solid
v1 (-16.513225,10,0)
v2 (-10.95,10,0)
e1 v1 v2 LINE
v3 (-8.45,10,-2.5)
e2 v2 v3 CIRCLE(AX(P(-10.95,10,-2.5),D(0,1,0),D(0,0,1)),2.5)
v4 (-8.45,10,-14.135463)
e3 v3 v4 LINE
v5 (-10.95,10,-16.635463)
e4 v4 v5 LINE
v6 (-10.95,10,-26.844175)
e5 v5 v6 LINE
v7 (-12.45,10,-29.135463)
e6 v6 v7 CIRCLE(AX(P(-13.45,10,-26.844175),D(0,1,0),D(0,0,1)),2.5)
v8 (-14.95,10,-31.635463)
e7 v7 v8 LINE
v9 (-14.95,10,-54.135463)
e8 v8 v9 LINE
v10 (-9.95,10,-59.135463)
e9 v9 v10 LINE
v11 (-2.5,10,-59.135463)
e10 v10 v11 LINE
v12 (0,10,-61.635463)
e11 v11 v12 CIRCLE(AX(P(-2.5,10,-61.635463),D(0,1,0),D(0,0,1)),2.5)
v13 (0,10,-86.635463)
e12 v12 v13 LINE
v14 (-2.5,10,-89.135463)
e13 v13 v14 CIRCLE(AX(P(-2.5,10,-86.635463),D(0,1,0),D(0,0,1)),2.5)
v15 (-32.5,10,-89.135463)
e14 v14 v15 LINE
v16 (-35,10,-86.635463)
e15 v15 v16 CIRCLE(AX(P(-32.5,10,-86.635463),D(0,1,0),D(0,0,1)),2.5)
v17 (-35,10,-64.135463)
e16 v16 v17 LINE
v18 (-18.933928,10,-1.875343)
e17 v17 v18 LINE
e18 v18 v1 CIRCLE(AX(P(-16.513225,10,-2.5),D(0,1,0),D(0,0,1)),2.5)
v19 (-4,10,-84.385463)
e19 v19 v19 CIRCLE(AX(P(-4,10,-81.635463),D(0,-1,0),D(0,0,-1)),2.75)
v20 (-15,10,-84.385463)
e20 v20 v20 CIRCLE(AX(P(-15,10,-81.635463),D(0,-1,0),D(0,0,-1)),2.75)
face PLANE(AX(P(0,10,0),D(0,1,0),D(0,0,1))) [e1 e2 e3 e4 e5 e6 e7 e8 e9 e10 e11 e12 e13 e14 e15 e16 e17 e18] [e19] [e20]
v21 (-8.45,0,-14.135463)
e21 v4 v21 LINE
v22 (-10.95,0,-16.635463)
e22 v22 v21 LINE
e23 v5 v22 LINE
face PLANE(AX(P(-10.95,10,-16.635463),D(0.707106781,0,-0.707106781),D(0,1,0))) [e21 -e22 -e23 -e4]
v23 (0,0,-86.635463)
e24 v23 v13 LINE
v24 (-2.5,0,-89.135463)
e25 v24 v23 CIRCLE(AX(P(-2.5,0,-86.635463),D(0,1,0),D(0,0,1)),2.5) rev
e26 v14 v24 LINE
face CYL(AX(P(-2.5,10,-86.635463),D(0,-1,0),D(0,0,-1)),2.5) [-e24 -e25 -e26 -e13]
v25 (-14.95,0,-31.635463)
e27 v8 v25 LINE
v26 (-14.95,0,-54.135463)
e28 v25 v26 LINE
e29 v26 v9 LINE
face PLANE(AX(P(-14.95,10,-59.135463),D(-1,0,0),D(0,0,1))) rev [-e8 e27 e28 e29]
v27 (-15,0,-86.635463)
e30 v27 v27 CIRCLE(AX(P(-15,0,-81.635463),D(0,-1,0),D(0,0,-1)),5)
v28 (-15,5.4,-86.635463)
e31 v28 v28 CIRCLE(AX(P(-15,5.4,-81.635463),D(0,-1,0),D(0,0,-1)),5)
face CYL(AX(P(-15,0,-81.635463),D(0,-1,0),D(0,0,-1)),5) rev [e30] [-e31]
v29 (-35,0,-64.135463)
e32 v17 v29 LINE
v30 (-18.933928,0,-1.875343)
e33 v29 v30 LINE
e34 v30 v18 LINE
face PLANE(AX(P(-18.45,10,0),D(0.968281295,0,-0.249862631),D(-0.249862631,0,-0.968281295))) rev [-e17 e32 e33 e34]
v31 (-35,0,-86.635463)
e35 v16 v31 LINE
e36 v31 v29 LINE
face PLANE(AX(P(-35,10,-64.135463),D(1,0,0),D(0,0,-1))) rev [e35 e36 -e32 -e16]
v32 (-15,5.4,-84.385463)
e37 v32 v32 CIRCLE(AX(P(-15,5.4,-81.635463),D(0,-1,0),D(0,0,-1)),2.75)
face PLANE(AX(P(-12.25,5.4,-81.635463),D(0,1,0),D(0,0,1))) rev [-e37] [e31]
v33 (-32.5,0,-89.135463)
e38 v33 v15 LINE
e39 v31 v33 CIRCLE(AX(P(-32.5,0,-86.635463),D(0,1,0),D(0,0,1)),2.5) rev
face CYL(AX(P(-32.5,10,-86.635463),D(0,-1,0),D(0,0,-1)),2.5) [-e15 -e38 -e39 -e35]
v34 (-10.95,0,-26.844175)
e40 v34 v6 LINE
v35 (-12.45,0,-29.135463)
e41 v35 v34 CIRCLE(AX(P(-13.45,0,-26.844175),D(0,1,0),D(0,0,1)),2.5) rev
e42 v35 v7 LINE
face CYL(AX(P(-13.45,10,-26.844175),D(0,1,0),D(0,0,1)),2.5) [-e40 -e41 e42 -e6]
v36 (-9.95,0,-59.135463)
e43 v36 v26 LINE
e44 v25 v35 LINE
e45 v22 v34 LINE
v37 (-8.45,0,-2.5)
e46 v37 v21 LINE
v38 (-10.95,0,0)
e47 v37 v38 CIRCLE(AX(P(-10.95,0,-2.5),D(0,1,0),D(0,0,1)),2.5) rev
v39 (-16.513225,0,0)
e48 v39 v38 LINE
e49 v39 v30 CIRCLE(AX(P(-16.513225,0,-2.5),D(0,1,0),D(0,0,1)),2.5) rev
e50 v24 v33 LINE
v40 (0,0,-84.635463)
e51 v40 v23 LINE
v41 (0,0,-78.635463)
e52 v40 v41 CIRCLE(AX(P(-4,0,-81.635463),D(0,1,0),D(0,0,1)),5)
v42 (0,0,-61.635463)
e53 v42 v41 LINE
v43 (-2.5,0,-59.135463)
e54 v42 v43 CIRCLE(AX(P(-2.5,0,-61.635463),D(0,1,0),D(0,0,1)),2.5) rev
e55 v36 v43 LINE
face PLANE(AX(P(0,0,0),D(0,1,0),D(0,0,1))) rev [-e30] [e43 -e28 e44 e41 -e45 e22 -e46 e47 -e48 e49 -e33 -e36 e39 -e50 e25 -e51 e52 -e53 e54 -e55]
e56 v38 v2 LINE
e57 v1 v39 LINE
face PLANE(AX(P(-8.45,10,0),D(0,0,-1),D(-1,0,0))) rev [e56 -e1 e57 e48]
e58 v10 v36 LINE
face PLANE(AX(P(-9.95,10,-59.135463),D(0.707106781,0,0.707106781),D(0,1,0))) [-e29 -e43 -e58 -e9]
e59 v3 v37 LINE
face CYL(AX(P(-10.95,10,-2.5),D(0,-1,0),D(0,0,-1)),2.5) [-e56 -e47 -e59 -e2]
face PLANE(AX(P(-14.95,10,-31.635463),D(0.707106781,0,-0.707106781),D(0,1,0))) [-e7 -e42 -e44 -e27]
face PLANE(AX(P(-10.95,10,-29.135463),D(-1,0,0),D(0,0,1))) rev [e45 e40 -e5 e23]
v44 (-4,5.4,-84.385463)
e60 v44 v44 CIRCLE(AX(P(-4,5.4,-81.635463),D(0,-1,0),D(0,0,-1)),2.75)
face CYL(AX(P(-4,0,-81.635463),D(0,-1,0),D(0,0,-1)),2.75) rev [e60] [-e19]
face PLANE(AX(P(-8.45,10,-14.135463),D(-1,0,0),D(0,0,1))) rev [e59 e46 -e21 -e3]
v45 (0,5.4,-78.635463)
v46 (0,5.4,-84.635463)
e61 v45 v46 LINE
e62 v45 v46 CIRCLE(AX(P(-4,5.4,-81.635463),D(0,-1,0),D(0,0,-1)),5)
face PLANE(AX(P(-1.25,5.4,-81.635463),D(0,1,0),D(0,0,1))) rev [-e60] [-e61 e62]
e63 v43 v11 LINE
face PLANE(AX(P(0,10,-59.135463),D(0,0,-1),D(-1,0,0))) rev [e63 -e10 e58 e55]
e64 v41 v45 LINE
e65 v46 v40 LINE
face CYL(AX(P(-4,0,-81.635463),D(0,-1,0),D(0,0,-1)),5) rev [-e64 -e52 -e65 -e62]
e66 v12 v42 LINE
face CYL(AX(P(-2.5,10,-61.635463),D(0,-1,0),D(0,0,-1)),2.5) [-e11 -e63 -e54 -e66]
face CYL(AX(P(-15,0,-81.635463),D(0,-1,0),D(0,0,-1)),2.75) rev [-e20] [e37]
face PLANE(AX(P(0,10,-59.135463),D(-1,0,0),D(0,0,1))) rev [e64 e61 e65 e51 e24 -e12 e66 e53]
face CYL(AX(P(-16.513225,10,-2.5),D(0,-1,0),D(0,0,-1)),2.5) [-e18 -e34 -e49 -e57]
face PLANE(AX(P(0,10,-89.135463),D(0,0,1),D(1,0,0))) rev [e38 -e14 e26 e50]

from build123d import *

# Parameters (mm, degrees)
BOSS_EXTRUDE1_DEPTH                                 = 10
CHAMFER1_SIZE                                       = 5
CHAMFER2_SIZE                                       = 2.5
FILLET1_R                                           = 2.5
CBORE_FOR_M5_HEX_SOCKET_HEAD_CAP_SCREW5_D           = 5.5
CBORE_FOR_M5_HEX_SOCKET_HEAD_CAP_SCREW5_DEPTH       = 10
CBORE_FOR_M5_HEX_SOCKET_HEAD_CAP_SCREW5_CBORE_D     = 10
CBORE_FOR_M5_HEX_SOCKET_HEAD_CAP_SCREW5_CBORE_DEPTH = 5.4
CBORE_FOR_M5_HEX_SOCKET_HEAD_CAP_SCREW5_TIP         = 1.652366702


# Some blends are built 0.0001 mm under size
with BuildPart() as part:
    # Sketch2 → Boss-Extrude1 (new body)
    with BuildSketch(Plane(origin=(0, 0, 0), x_dir=(1, 0, 0), z_dir=(0, 1, 0))):
        Polygon((0, 59.135462652), (-14.95, 59.135462652), (-14.95, 29.135462652), (-10.95, 29.135462652), (-10.95, 14.135462652), (-8.45, 14.135462652), (-8.45, 0), (-18.45, 0), (-35, 64.135462652), (-35, 89.135462652), (0, 89.135462652), align=None)
    extrude(amount=BOSS_EXTRUDE1_DEPTH)

    # Chamfer1
    chamfer1_edges = [part.edges().sort_by_distance(p)[0] for p in [
        (-14.95, 5, -59.135462652),
    ]]
    chamfer(chamfer1_edges, length=CHAMFER1_SIZE)

    # Chamfer2
    chamfer2_edges = [part.edges().sort_by_distance(p)[0] for p in [
        (-10.95, 5, -14.135462652),
        (-14.95, 5, -29.135462652),
    ]]
    chamfer(chamfer2_edges, length=CHAMFER2_SIZE - 0.0001)  # a hair under: the kernel refuses the full size

    # Fillet1
    # the kernel refuses this fillet: 2.5 mm, written as the material it takes off along each edge
    with BuildSketch(Plane(origin=(0, -6.25, -89.135462652), x_dir=(0, 0, 1), z_dir=(0, 1, 0)), Plane(origin=(-35, -6.25, -89.135462652), x_dir=(1, 0, 0), z_dir=(0, 1, 0)), Plane(origin=(0, -6.25, -59.135462652), x_dir=(-1, 0, 0), z_dir=(0, 1, 0))) as fillet1_piece_1:
        with BuildLine():
            CenterArc((FILLET1_R, -FILLET1_R), FILLET1_R, 90, 90)
            Line((0, -FILLET1_R), (-FILLET1_R * 0.02, -FILLET1_R))
            Line((-FILLET1_R * 0.02, -FILLET1_R), (-FILLET1_R * 0.02, FILLET1_R * 0.02))
            Line((-FILLET1_R * 0.02, FILLET1_R * 0.02), (FILLET1_R, FILLET1_R * 0.02))
            Line((FILLET1_R, FILLET1_R * 0.02), (FILLET1_R, 0))
        make_face()
    extrude(amount=22.5, mode=Mode.SUBTRACT)
    with BuildSketch(Plane(origin=(-8.45, -6.25, 0), x_dir=(0, 0, -1), z_dir=(0, 1, 0))) as fillet1_piece_2:
        with BuildLine():
            CenterArc((FILLET1_R, FILLET1_R), FILLET1_R, 180, 90)
            Line((0, FILLET1_R), (-FILLET1_R * 0.02, FILLET1_R))
            Line((-FILLET1_R * 0.02, FILLET1_R), (-FILLET1_R * 0.02, -FILLET1_R * 0.02))
            Line((-FILLET1_R * 0.02, -FILLET1_R * 0.02), (FILLET1_R, -FILLET1_R * 0.02))
            Line((FILLET1_R, -FILLET1_R * 0.02), (FILLET1_R, 0))
        make_face()
    extrude(amount=22.5, mode=Mode.SUBTRACT)
    with BuildSketch(Plane(origin=(-18.45, -4.84193858, 0), x_dir=(-0.24986263082994187, 0, -0.9682812947252158), z_dir=(0, 1, 0))) as fillet1_piece_3:
        with BuildLine():
            CenterArc((FILLET1_R * 0.774710172815, -FILLET1_R), FILLET1_R, 90, 75.530616462)
            Line((-FILLET1_R * 0.19357112191, -FILLET1_R * 0.75013736917), (-FILLET1_R * 0.212936747805, -FILLET1_R * 0.745140116553))
            Line((-FILLET1_R * 0.212936747805, -FILLET1_R * 0.745140116553), (-FILLET1_R * 0.0154942034563, FILLET1_R * 0.02))
            Line((-FILLET1_R * 0.0154942034563, FILLET1_R * 0.02), (FILLET1_R * 0.774710172815, FILLET1_R * 0.02))
            Line((FILLET1_R * 0.774710172815, FILLET1_R * 0.02), (FILLET1_R * 0.774710172815, 0))
        make_face()
    extrude(amount=19.68387716, mode=Mode.SUBTRACT)
    with BuildSketch(Plane(origin=(-10.95, -5.728328721, -29.135462652), x_dir=(-1, 0, 0), z_dir=(0, 1, 0))) as fillet1_piece_4:
        with BuildLine():
            CenterArc((2.5, 2.291331488), FILLET1_R, 180, 66.424322091)
            Line((0, 2.291331488), (-0.05, 2.291331488))
            Line((-0.05, 2.291331488), (-0.05, 0))
            Line((-0.05, 0), (0, -0.05))
            ThreePointArc((0, -0.05), (0.75005, -0.05), (1.480102, -0.04582663))
            Line((1.480102, -0.04582663), (1.5001, 0))
        make_face()
    extrude(amount=21.456657442, mode=Mode.SUBTRACT)

    # CBORE for M5 Hex Socket Head Cap Screw5
    with Locations(Plane(origin=(0, 0, 0), x_dir=(-1, 0, 0), z_dir=(0, -1, 0))):
        with Locations((4, 81.635462652), (15, 81.635462652)):
            CounterBoreHole(CBORE_FOR_M5_HEX_SOCKET_HEAD_CAP_SCREW5_D / 2, CBORE_FOR_M5_HEX_SOCKET_HEAD_CAP_SCREW5_CBORE_D / 2, CBORE_FOR_M5_HEX_SOCKET_HEAD_CAP_SCREW5_CBORE_DEPTH, depth=CBORE_FOR_M5_HEX_SOCKET_HEAD_CAP_SCREW5_DEPTH)
            with Locations((0, 0, -(CBORE_FOR_M5_HEX_SOCKET_HEAD_CAP_SCREW5_DEPTH + CBORE_FOR_M5_HEX_SOCKET_HEAD_CAP_SCREW5_TIP / 2))):  # 118° drill point
                Cone(0, CBORE_FOR_M5_HEX_SOCKET_HEAD_CAP_SCREW5_D / 2, CBORE_FOR_M5_HEX_SOCKET_HEAD_CAP_SCREW5_TIP, mode=Mode.SUBTRACT)


solid = part.part
